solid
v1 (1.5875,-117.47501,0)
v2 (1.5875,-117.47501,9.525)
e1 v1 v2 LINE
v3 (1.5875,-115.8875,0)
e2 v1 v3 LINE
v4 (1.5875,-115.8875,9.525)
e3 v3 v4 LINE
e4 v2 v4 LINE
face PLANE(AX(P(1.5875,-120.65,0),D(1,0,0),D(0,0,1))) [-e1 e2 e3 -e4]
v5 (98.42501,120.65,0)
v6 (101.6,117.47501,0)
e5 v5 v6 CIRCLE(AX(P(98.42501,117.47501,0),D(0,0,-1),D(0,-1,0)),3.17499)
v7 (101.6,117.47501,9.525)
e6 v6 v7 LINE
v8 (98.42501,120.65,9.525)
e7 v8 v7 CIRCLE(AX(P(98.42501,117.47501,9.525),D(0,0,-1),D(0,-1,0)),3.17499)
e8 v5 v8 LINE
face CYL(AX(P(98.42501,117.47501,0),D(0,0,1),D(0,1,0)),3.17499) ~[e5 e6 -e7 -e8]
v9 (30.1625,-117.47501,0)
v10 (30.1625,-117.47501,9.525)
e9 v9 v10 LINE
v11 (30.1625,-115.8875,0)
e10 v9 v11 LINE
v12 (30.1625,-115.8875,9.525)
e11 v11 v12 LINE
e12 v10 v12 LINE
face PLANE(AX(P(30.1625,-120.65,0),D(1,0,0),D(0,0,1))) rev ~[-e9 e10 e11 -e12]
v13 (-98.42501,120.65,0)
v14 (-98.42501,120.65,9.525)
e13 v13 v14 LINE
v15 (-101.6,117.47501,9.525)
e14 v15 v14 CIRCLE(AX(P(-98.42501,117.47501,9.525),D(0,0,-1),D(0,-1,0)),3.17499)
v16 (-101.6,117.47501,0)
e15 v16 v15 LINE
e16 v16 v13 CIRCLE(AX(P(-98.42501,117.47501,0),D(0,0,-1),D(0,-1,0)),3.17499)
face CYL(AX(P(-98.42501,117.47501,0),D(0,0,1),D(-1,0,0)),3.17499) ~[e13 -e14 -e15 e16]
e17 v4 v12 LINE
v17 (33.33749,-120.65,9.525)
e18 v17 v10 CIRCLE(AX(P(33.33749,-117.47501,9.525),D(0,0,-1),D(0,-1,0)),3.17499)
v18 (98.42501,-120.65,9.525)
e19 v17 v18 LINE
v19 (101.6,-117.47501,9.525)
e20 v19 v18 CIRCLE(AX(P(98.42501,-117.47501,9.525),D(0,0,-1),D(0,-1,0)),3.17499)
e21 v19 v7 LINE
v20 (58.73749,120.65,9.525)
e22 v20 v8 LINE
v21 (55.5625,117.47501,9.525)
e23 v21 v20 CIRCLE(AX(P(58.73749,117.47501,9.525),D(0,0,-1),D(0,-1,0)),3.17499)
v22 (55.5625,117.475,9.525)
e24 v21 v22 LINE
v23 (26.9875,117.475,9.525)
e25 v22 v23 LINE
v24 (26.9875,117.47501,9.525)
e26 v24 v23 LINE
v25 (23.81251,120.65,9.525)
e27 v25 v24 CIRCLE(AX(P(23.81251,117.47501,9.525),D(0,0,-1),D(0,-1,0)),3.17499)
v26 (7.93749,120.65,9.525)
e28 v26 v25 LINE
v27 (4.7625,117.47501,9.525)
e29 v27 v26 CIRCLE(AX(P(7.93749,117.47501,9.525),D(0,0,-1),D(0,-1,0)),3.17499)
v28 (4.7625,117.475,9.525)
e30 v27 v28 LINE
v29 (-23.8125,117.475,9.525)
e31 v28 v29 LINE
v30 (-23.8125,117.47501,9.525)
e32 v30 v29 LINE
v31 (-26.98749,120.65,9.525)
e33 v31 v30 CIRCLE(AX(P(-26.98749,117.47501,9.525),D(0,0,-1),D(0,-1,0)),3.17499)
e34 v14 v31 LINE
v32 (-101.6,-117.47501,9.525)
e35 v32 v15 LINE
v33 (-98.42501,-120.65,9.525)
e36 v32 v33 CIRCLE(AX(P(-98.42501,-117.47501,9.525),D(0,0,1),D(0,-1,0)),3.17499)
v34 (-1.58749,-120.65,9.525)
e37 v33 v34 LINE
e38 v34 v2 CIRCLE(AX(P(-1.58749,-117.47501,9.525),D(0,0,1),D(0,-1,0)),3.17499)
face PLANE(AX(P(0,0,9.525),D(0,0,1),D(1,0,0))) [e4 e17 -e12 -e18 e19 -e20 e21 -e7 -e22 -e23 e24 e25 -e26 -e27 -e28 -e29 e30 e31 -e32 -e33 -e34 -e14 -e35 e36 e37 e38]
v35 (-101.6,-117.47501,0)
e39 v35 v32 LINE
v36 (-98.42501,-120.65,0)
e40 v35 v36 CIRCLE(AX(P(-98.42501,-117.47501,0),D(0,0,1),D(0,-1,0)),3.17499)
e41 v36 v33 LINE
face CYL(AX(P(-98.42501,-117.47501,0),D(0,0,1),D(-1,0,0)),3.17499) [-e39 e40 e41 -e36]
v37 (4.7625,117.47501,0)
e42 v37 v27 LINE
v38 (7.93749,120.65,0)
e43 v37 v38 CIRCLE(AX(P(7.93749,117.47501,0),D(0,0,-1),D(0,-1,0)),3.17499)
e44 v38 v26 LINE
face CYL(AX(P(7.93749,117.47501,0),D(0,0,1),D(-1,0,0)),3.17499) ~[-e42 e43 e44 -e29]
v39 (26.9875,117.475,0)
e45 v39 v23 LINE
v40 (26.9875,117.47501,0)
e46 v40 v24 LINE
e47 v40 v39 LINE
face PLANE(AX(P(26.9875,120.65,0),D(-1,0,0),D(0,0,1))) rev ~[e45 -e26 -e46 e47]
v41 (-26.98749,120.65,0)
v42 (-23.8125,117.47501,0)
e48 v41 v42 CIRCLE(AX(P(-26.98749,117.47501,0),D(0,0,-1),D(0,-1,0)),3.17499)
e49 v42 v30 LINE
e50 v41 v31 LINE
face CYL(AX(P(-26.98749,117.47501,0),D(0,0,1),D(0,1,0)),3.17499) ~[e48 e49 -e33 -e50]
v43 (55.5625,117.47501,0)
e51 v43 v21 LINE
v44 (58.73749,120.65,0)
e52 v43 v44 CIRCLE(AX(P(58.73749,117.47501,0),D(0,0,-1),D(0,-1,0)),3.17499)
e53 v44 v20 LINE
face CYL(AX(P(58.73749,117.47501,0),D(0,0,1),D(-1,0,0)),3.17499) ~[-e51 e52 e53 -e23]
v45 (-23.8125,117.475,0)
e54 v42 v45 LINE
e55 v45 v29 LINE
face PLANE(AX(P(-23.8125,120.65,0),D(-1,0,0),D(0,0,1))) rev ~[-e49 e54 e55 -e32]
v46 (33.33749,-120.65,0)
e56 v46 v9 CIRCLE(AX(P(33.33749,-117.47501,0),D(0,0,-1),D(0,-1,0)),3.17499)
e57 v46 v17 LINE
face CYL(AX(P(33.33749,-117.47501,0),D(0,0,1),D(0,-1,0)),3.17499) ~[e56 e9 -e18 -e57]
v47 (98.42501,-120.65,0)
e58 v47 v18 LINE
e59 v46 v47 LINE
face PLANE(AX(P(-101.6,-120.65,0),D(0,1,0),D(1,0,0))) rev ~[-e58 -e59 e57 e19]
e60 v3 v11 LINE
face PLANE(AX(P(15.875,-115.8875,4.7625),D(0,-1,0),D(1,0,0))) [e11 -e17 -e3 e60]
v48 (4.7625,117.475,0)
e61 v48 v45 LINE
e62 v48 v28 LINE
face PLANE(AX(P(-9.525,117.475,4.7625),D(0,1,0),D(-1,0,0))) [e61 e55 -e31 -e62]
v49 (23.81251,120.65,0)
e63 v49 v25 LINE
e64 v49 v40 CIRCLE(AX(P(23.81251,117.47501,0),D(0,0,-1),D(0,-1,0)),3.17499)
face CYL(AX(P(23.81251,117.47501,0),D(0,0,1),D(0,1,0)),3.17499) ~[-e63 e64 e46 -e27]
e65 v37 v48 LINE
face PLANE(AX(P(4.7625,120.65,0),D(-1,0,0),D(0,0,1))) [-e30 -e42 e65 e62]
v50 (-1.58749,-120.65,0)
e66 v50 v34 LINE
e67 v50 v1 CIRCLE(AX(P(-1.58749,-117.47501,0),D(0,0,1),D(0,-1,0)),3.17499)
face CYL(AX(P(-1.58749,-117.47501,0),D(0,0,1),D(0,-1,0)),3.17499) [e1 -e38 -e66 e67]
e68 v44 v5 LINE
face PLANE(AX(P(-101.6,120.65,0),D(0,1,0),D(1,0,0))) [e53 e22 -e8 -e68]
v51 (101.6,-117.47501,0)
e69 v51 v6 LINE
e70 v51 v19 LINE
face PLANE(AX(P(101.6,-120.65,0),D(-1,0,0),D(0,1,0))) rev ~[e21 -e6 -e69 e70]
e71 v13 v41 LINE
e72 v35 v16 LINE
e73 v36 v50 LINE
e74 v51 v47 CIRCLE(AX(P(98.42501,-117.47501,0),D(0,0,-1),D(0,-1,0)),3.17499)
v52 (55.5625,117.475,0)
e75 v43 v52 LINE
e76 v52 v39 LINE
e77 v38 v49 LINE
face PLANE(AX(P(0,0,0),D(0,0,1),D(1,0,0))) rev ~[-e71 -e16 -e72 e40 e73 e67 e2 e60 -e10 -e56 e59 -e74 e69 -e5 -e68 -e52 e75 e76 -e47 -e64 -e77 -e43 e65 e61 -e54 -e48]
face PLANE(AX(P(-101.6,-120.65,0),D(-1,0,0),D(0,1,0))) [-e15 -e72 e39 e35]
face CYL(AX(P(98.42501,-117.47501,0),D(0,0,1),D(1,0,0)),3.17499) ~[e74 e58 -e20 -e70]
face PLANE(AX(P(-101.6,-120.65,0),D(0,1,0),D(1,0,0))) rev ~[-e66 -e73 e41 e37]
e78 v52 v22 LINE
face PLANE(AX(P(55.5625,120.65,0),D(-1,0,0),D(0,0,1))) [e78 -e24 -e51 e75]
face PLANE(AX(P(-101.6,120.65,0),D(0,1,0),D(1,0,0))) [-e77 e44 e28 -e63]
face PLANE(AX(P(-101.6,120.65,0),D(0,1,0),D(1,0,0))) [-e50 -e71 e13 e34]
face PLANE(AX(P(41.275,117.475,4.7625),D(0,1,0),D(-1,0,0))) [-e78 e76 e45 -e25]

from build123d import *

# Parameters (mm, degrees)
F0_W     = 203.2
F0_H     = 241.3
F1_DEPTH = 9.525
F2_W     = 28.575
F2_H     = 9.525
F3_DEPTH = 4.7625
F4_W     = 28.575
F4_H     = 9.525
F5_DEPTH = 3.175
F6_R     = 3.17499


# Not quite as in the source:
# - a fillet or chamfer is up to 0.001 mm smaller than in the source, because OpenCascade refuses the exact size


with BuildPart() as f1:
    # F0 (on Top) → F1 (new body)
    with BuildSketch(Plane.XY):
        Rectangle(F0_W, F0_H)
    extrude(amount=F1_DEPTH)

    # F2 (on face) → F3 (cut)
    with BuildSketch(Plane.XZ.offset(120.65)):
        with Locations((15.875, 4.7625)):
            Rectangle(F2_W, F2_H)
    extrude(amount=-F3_DEPTH, mode=Mode.SUBTRACT)

    # F4 (on face) → F5 (cut)
    with BuildSketch(Plane(origin=(0, 120.65, 0), x_dir=(-1, 0, 0), z_dir=(0, 1, 0))):
        with Locations((-41.275, 4.7625)):
            Rectangle(F4_W, F4_H)
        with Locations((9.525, 4.7625)):
            Rectangle(F4_W, F4_H)
    extrude(amount=-F5_DEPTH, mode=Mode.SUBTRACT)

    # F6 (radius 3.175 in the source; OpenCascade refuses exactly that, so slightly less here)
    f6_edges = [f1.edges().sort_by_distance(p)[0] for p in [
        (-101.6, 120.65, 4.7625),
        (-23.8125, 120.65, 4.7625),
        (4.7625, 120.65, 4.7625),
        (26.9875, 120.65, 4.7625),
        (55.5625, 120.65, 4.7625),
        (101.6, 120.65, 4.7625),
        (-101.6, -120.65, 4.7625),
        (1.5875, -120.65, 4.7625),
        (30.1625, -120.65, 4.7625),
        (101.6, -120.65, 4.7625),
    ]]
    fillet(f6_edges, radius=F6_R)


solid = f1.part
